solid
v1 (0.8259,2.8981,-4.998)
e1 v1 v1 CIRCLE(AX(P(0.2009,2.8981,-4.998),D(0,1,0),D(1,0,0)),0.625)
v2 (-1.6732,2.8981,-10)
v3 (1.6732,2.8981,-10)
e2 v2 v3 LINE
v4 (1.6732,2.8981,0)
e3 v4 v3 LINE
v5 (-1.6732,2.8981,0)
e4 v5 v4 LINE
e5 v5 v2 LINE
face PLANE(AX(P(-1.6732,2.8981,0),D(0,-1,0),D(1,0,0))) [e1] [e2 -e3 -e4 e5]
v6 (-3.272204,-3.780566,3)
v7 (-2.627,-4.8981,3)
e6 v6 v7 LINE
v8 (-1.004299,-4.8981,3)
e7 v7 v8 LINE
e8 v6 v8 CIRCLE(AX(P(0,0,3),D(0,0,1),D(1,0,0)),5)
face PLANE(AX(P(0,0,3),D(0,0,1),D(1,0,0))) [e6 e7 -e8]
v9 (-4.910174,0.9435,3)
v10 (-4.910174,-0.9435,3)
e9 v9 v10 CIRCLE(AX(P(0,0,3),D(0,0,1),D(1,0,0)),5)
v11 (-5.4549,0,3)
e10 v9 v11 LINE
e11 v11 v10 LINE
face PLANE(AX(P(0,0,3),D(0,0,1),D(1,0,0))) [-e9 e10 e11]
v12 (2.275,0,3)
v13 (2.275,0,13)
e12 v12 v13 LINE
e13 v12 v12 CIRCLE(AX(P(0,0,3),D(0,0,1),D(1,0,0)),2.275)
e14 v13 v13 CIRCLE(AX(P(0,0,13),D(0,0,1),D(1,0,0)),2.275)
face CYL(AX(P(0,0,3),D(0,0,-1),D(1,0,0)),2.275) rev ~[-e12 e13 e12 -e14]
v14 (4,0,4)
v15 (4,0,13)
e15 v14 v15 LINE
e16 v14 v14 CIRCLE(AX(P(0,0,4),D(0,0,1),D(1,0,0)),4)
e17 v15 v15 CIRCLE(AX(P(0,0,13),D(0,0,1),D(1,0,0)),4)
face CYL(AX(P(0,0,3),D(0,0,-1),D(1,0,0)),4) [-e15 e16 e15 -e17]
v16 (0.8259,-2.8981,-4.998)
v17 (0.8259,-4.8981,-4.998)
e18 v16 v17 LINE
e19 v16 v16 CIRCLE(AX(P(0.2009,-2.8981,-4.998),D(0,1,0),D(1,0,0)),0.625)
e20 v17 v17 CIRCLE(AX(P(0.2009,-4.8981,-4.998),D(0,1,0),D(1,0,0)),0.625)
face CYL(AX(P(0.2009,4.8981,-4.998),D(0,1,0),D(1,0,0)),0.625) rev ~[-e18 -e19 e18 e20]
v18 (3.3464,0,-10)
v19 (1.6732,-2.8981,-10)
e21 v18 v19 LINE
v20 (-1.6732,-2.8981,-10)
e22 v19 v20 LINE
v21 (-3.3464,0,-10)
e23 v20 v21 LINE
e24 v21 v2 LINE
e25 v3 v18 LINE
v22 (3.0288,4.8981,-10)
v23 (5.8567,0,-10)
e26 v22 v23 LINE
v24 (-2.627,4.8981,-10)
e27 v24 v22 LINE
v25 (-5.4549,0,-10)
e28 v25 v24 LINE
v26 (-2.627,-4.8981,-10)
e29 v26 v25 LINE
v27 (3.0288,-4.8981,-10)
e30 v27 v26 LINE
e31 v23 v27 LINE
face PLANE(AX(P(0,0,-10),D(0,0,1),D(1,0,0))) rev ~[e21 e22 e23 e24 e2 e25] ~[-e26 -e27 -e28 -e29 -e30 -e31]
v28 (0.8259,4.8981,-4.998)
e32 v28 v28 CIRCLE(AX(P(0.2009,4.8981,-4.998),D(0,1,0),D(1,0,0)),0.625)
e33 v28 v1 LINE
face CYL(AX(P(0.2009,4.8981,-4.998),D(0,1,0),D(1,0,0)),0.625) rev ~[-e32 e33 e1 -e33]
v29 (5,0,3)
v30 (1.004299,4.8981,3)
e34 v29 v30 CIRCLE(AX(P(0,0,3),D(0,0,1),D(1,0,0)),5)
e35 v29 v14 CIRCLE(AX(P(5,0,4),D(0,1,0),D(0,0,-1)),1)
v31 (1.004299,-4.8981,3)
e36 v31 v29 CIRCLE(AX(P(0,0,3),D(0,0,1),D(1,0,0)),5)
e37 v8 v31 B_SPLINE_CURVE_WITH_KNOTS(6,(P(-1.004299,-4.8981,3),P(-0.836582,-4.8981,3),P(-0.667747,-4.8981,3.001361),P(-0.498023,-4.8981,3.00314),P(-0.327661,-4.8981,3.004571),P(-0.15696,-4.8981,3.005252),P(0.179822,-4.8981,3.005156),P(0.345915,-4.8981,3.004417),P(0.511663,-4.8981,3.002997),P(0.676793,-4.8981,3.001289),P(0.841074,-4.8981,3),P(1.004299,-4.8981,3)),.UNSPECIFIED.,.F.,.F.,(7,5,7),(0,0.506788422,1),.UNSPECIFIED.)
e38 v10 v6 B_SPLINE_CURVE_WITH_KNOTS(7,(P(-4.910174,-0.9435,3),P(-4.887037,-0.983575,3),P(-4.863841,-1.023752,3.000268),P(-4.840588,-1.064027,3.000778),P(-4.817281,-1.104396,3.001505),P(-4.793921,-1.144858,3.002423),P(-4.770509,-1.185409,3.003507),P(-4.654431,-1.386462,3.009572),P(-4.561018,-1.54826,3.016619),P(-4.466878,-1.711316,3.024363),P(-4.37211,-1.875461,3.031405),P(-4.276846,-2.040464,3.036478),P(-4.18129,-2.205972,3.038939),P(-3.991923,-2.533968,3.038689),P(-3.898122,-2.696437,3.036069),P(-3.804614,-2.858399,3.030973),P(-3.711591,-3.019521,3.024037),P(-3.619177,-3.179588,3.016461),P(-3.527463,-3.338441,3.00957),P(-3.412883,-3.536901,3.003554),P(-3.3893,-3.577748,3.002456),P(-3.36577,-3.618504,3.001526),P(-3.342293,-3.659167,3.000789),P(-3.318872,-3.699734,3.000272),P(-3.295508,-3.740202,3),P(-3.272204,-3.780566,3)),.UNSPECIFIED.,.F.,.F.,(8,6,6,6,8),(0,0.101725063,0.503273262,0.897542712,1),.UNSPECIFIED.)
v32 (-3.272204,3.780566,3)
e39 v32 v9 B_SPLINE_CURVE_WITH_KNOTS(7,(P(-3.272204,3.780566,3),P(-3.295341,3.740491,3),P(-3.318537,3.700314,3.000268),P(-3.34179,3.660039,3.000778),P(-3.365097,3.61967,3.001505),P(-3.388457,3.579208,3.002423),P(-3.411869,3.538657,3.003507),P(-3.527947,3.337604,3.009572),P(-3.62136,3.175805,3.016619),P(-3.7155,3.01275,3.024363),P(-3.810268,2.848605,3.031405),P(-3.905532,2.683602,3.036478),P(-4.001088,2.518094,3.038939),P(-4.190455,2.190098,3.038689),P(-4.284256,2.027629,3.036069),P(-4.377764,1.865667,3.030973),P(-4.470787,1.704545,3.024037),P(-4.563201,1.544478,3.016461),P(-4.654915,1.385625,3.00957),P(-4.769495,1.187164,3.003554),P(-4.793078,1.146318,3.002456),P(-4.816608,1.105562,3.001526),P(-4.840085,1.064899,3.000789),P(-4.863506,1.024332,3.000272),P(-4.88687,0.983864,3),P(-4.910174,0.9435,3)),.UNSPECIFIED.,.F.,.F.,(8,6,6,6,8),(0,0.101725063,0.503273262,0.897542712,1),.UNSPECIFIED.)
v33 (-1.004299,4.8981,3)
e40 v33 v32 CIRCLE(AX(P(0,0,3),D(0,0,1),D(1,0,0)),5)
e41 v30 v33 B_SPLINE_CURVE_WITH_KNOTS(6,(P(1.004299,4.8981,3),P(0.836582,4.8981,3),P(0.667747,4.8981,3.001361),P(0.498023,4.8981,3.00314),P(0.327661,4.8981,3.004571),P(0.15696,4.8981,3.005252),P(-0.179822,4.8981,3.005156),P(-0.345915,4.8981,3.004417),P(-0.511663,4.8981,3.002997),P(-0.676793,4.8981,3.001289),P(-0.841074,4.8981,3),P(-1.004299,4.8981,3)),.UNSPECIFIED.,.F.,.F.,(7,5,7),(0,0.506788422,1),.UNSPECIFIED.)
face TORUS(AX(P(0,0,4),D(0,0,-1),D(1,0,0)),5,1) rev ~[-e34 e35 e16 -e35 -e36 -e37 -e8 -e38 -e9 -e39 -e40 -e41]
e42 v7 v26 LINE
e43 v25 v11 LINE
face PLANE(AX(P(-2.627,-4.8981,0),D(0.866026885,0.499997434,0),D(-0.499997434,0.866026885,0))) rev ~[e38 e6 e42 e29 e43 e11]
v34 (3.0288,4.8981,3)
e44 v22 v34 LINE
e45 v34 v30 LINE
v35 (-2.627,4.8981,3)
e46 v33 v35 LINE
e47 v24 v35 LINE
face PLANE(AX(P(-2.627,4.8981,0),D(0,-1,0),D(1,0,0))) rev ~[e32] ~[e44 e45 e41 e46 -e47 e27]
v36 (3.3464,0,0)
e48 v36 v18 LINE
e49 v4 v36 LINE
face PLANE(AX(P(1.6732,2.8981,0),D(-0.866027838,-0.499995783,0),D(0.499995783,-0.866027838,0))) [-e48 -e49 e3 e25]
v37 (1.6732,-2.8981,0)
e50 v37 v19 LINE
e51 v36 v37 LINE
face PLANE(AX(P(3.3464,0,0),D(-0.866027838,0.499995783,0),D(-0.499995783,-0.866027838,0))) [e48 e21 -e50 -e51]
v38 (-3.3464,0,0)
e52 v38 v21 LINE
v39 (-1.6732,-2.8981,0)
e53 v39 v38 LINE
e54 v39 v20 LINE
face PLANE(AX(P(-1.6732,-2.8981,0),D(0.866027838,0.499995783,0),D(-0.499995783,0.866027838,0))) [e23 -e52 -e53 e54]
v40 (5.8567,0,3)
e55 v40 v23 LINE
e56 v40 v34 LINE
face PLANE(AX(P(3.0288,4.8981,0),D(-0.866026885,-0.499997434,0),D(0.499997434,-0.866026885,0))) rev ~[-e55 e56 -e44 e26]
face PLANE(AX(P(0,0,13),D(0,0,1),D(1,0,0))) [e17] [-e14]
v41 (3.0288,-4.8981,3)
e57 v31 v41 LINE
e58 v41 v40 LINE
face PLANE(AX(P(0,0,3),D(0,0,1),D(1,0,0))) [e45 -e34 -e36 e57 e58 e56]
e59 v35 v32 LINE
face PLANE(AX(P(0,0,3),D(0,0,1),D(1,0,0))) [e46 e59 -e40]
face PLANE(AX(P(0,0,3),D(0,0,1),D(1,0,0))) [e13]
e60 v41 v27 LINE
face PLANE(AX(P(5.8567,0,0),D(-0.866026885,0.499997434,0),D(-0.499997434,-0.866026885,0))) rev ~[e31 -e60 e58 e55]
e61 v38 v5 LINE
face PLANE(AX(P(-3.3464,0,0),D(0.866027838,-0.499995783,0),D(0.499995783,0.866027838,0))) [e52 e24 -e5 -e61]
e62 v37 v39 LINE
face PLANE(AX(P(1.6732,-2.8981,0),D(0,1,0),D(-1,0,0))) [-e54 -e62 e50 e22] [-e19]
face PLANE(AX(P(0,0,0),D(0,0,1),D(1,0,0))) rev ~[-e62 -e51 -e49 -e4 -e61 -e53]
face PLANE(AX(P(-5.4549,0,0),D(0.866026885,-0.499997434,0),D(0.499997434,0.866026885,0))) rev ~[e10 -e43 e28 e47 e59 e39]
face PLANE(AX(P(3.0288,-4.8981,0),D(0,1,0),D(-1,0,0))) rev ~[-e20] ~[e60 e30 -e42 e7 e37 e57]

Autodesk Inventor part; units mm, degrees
ref_plane "YZ Plane" through (0, 0, 0) normal (1, 0, 0) x (0, 1, 0)
ref_plane "XZ Plane" through (0, 0, 0) normal (0, 1, 0) x (-1, 0, 0)
ref_plane "XY Plane" through (0, 0, 0) normal (0, 0, 1) x (1, 0, 0)
sketch "Sketch1" plane through (0, 0, 0) normal (0, 0, 1) x (1, 0, 0)
  line L0 (-1.6732, 2.8981) -> (1.6732, 2.8981) projected
  line L1 (-3.3464, 0) -> (-1.6732, 2.8981) projected
  line L2 (-1.6732, -2.8981) -> (-3.3464, 0) projected
  line L3 (1.6732, -2.8981) -> (-1.6732, -2.8981) projected
  line L4 (3.3464, 0) -> (1.6732, -2.8981) projected
  line L5 (1.6732, 2.8981) -> (3.3464, 0) projected
  line L6 (3.0288, 4.8981) -> (5.8567, 0) projected
  line L7 (-2.627, 4.8981) -> (3.0288, 4.8981) projected
  line L8 (-5.4549, 0) -> (-2.627, 4.8981) projected
  line L9 (-2.627, -4.8981) -> (-5.4549, 0) projected
  line L10 (3.0288, -4.8981) -> (-2.627, -4.8981) projected
  line L11 (5.8567, 0) -> (3.0288, -4.8981) projected
  point P0 (0, 0)
extrude "Extrusion1" add sketch "Sketch1" against normal blind 10
sketch "Sketch2" plane through (0, 0, 0) normal (0, 0, 1) x (1, 0, 0)
  line L0 (3.0288, 4.8981) -> (-2.627, 4.8981) projected
  line L1 (-2.627, 4.8981) -> (-5.4549, 0) projected
  line L2 (-5.4549, 0) -> (-2.627, -4.8981) projected
  line L3 (-2.627, -4.8981) -> (3.0288, -4.8981) projected
  line L4 (3.0288, -4.8981) -> (5.8567, 0) projected
  line L5 (5.8567, 0) -> (3.0288, 4.8981) projected
  point P0 (0, 0)
extrude "Extrusion2" add sketch "Sketch2" along normal blind 3
sketch "Sketch3" plane through (0, 0, 3) normal (0, 0, 1) x (1, 0, 0)
  circle A0 centre (0, 0) radius 4
  circle A1 centre (0, 0) radius 2.275
  dimension "d4" = 8
  dimension "d5" = 4.55
extrude "Extrusion3" add sketch "Sketch3" along normal blind 10
fillet "Fillet1" radius 1 1 edges at (-4, 0, 3)
sketch "Sketch4" plane through (-2.627, 4.8981, -10) normal (0, 1, 0) x (1, 0, 0)
  line L0 (5.6558, 0) -> (5.6558, -13) projected
  line L1 (0, 0) -> (5.6558, 0) projected
  line L2 (0, -13) -> (0, 0) projected
  line L3 (5.6558, -13) -> (3.6314, -13) projected
  line L4 (0.9538, -10) -> (4.3002, -10) projected
  line L5 (5.6558, 0) -> (0, 0) projected
  line L6 (2.8279, 0) -> (2.8279, -10) construction
  circle A0 centre (2.8279, -5.002) radius 0.625
  line L7 (1.6226, -13) -> (0, -13) projected
  point P0 (2.627, -10)
  point P1 (2.8279, 0)
  dimension "d9" = 1.25
extrude "Extrusion4" cut sketch "Sketch4" against normal blind 10
properties part number "Acople_Motor"
